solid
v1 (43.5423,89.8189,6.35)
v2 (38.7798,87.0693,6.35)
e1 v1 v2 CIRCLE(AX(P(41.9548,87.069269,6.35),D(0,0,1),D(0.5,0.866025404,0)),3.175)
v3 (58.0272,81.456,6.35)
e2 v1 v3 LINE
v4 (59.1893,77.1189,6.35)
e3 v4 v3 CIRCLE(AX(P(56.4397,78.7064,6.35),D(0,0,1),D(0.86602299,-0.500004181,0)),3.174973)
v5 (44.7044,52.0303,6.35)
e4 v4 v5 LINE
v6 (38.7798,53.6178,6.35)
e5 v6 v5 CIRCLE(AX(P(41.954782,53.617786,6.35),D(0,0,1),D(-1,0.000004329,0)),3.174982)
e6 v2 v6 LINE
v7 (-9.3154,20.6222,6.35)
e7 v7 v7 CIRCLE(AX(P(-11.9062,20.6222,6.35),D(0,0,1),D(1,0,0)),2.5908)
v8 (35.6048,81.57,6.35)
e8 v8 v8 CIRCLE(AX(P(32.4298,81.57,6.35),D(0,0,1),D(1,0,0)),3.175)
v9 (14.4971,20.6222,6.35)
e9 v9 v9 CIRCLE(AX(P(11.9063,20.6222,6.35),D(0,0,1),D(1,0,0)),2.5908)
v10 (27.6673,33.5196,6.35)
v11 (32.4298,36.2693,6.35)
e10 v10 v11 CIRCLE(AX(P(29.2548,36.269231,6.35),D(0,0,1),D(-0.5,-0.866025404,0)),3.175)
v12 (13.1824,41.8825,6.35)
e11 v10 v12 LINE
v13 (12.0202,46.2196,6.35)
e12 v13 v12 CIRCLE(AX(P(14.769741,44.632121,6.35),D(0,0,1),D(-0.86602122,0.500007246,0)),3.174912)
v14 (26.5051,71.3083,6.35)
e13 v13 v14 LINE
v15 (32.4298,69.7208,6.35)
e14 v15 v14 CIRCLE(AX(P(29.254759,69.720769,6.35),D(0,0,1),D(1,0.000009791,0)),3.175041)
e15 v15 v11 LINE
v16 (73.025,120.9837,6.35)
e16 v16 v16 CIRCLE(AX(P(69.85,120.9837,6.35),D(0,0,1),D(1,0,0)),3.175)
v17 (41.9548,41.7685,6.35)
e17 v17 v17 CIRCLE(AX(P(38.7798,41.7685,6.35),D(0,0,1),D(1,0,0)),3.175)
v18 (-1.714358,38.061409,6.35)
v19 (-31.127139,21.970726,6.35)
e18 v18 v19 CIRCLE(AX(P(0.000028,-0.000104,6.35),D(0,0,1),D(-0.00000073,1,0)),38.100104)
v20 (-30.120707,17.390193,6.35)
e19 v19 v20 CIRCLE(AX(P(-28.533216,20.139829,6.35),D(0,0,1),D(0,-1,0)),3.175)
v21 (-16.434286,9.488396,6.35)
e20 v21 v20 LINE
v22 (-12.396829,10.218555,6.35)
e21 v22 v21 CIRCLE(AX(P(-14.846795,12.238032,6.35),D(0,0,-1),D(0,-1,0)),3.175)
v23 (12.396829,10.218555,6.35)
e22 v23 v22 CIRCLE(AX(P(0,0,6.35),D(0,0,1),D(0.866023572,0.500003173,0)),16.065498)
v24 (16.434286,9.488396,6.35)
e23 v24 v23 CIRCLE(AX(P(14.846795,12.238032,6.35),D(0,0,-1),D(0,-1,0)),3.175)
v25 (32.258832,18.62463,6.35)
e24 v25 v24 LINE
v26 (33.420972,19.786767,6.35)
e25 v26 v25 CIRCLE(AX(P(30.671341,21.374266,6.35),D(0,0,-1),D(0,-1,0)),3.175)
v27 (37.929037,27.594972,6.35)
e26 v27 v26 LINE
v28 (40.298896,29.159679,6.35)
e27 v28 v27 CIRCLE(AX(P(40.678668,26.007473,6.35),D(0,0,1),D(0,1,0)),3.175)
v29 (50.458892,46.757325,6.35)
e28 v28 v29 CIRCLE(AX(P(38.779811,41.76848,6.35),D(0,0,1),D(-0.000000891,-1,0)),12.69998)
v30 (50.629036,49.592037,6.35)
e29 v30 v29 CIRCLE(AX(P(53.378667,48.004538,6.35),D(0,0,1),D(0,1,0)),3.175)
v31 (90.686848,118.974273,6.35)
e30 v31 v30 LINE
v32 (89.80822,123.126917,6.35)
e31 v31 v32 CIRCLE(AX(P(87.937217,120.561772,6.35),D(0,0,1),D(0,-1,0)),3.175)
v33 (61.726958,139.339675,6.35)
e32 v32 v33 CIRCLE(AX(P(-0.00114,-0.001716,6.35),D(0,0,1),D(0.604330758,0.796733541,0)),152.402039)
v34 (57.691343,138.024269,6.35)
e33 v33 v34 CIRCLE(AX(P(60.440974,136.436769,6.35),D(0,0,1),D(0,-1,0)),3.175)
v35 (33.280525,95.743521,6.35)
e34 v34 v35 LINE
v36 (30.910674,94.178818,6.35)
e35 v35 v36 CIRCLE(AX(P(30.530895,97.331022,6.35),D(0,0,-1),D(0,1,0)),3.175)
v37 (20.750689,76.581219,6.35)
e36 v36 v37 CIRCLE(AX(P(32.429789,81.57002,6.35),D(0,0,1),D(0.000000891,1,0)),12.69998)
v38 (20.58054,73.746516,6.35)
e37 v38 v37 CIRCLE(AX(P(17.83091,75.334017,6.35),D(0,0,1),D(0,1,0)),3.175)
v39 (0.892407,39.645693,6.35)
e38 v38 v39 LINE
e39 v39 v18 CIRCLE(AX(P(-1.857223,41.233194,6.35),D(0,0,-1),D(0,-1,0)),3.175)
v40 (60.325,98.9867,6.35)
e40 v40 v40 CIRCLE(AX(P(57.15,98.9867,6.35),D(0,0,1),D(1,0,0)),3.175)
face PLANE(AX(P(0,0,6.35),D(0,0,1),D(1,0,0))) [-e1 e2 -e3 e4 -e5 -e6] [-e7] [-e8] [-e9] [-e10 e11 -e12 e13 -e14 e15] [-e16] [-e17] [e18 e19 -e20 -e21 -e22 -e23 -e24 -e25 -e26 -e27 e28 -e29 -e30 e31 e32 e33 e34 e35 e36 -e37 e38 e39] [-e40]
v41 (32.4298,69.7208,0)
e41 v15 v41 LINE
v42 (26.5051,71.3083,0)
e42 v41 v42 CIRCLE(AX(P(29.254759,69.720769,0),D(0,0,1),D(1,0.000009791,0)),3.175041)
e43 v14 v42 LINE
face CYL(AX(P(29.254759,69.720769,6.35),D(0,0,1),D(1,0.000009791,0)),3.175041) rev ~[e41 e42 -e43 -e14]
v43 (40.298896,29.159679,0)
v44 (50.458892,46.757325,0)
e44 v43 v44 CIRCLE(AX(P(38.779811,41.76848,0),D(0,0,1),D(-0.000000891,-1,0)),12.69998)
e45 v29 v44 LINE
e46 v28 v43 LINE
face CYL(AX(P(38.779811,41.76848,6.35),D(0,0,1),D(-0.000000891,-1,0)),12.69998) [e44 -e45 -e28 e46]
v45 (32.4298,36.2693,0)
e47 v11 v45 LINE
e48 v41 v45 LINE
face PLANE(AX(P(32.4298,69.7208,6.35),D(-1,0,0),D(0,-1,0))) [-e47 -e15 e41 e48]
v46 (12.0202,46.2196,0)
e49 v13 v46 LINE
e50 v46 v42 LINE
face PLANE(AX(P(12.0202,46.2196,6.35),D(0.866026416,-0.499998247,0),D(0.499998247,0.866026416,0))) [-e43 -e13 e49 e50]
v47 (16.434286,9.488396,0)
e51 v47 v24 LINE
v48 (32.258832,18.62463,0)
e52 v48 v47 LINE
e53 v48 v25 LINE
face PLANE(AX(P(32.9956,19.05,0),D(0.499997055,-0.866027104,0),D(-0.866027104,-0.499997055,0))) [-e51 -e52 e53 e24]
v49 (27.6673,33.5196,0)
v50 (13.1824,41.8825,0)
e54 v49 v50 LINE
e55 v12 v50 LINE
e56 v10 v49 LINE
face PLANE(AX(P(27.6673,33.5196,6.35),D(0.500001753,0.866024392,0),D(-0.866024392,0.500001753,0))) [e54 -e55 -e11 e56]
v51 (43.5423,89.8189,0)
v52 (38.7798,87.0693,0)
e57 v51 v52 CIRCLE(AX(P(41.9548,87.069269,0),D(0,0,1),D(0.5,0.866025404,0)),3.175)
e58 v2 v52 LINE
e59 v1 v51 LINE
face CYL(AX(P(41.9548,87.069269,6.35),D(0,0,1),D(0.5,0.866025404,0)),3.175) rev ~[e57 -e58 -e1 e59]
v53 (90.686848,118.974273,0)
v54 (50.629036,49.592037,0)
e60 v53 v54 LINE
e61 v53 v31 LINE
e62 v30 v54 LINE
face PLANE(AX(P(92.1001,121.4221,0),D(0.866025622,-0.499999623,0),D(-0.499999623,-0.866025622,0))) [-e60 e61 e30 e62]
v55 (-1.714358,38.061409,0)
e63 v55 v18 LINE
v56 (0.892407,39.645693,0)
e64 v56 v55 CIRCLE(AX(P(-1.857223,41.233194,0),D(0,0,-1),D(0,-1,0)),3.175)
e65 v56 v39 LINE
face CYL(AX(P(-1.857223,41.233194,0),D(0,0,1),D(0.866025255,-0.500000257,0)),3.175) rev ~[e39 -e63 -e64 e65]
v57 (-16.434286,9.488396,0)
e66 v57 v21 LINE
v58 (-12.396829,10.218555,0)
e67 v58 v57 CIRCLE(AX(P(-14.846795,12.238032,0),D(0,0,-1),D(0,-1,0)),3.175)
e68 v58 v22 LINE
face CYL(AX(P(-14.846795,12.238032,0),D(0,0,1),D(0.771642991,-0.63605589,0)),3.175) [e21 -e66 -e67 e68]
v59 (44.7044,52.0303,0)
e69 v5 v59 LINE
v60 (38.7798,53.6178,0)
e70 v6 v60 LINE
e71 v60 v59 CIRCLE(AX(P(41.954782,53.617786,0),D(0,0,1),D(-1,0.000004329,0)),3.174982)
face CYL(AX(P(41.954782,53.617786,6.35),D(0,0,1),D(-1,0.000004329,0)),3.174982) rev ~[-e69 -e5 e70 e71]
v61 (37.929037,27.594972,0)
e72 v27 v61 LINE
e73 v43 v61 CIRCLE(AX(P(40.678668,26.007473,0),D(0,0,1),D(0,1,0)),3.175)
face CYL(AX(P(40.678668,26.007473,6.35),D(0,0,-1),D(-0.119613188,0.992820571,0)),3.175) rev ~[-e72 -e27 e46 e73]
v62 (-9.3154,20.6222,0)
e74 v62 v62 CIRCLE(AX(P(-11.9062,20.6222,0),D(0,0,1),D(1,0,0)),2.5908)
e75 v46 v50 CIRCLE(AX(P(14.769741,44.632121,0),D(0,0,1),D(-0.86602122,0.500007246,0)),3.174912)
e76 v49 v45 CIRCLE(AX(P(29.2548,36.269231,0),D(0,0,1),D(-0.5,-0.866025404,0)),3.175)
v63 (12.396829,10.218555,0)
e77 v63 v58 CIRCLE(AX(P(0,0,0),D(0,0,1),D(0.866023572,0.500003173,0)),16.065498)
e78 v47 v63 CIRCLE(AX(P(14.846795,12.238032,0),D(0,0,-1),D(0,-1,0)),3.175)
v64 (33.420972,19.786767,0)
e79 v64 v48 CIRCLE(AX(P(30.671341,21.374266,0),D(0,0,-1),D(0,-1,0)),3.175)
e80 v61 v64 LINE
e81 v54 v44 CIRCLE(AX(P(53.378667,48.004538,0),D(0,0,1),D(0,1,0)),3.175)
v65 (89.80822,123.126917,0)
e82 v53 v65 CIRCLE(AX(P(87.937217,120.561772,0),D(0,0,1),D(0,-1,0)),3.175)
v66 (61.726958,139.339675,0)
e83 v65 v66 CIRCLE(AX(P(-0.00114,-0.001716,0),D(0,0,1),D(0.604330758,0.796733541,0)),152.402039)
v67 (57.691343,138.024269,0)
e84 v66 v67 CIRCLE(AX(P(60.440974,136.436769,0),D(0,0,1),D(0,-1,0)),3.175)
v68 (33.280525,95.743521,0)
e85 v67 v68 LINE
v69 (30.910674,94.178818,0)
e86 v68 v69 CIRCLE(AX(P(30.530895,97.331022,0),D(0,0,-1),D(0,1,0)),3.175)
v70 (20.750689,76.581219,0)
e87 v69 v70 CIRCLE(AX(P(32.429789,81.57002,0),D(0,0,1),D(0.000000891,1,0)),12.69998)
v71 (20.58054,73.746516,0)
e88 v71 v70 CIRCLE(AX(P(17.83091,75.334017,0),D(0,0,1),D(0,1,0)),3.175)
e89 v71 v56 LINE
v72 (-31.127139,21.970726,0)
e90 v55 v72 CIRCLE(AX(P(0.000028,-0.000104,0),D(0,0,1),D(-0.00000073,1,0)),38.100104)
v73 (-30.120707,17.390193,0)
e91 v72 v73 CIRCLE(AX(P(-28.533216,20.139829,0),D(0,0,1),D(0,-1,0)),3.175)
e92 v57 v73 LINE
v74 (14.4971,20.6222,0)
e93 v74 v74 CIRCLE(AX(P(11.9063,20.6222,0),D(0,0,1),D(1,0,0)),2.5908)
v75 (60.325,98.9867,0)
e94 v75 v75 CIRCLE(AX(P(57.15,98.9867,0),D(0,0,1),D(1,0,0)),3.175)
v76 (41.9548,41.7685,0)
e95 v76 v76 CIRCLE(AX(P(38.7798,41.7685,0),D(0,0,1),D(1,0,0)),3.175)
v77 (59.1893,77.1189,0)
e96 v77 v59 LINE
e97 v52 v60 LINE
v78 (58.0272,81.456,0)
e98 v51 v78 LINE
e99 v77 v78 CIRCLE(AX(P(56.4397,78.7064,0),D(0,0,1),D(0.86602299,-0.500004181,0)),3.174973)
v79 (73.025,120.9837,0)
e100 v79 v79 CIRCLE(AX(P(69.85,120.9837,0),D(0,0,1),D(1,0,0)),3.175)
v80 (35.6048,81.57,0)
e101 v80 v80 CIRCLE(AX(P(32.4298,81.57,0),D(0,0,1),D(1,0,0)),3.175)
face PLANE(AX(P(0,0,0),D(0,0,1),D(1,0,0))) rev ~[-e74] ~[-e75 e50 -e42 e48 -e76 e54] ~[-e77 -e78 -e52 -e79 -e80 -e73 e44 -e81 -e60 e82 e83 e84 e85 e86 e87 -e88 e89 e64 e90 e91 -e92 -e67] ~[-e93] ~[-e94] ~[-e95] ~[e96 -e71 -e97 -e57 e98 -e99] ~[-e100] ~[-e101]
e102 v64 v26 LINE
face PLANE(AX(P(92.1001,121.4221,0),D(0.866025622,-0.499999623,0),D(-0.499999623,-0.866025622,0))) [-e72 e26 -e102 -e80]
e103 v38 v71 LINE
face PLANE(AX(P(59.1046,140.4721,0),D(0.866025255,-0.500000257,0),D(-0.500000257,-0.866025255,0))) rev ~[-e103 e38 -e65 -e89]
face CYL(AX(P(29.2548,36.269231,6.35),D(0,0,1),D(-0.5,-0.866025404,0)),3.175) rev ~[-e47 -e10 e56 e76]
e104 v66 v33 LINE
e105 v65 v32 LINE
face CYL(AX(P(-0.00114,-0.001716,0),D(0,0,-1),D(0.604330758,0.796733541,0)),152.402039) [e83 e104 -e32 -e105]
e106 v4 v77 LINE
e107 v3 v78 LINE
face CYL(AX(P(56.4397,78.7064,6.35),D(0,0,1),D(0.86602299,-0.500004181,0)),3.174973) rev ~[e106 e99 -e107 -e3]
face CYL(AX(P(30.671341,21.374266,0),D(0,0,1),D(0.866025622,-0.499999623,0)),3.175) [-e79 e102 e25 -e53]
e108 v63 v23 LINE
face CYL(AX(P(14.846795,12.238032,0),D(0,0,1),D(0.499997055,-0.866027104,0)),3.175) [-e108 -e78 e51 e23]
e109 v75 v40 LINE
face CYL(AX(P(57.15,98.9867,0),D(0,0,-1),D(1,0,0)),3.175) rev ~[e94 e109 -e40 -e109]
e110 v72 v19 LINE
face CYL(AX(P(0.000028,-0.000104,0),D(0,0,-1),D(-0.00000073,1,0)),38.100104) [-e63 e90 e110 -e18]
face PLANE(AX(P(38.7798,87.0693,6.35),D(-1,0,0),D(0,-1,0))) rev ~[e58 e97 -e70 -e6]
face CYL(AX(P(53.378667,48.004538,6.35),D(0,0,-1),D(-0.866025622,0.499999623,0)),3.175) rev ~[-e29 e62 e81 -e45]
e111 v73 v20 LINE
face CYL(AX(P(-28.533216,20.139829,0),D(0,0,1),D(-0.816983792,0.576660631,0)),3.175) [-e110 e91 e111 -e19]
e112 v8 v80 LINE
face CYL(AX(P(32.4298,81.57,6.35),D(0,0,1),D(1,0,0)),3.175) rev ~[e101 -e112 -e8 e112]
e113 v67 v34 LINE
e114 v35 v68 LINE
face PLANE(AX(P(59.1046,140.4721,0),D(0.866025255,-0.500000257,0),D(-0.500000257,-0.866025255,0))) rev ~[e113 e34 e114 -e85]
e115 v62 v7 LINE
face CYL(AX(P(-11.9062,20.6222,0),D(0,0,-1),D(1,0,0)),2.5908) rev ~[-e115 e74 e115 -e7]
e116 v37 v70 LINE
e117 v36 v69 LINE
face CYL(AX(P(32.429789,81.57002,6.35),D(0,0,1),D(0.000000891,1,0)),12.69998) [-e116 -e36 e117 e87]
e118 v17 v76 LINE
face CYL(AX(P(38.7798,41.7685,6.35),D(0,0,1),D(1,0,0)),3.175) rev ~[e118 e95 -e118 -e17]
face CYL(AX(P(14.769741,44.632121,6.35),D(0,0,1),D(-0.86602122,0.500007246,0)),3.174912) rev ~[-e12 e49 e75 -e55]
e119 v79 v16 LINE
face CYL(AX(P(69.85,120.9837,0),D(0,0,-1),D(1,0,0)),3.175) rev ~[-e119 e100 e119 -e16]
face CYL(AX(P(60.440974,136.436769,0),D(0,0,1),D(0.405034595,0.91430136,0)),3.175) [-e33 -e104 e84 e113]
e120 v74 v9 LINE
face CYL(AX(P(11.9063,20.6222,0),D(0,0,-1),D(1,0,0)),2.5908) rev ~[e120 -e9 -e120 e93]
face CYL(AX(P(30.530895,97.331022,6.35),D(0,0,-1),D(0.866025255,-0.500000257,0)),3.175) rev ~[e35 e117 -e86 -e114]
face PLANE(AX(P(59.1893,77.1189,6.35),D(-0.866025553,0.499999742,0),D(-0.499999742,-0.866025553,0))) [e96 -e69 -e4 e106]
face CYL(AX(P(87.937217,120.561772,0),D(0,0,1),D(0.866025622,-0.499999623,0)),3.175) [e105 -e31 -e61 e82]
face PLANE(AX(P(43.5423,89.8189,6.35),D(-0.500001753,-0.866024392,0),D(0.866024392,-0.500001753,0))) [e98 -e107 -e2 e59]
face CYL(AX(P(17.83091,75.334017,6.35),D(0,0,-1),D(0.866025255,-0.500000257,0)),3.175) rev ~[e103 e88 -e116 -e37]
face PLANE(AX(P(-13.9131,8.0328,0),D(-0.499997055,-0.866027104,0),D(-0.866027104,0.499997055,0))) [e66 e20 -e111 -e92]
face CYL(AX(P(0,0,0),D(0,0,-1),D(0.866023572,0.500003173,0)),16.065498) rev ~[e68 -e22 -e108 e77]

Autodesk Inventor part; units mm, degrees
ref_plane "YZ Plane" through (0, 0, 0) normal (1, 0, 0) x (0, 1, 0)
ref_plane "XZ Plane" through (0, 0, 0) normal (0, 1, 0) x (-1, 0, 0)
ref_plane "XY Plane" through (0, 0, 0) normal (0, 0, 1) x (1, 0, 0)
sketch "Sketch1" plane through (0, 0, 0) normal (0, 0, 1) x (1, 0, 0)
  circle A0 centre (11.9062, -20.6222) radius 2.5908 construction
  circle A1 centre (-23.8125, 0) radius 2.5908 construction
  circle A2 centre (11.9063, 20.6222) radius 2.5908 projected
  circle A3 centre (23.8125, 0) radius 2.5908 construction
  circle A4 centre (-11.9062, 20.6222) radius 2.5908 projected
  circle A5 centre (-11.9062, -20.6222) radius 2.5908 construction
  circle A6 centre (0, 0) radius 14.478 construction
  circle A7 centre (57.15, 98.9867) radius 3.175 projected
  circle A8 centre (69.85, 120.9837) radius 3.175 projected
  circle A9 centre (98.9867, 57.15) radius 3.175 construction
  circle A10 centre (120.9837, 69.85) radius 3.175 construction
  circle A11 centre (114.3, 0) radius 3.175 construction
  circle A12 centre (139.7, 0) radius 3.175 construction
  circle A13 centre (98.9867, -57.15) radius 3.175 construction
  circle A14 centre (120.9837, -69.85) radius 3.175 construction
  circle A15 centre (57.15, -98.9867) radius 3.175 construction
  circle A16 centre (69.85, -120.9837) radius 3.175 construction
  circle A17 centre (0, -114.3) radius 3.175 construction
  circle A18 centre (0, -139.7) radius 3.175 construction
  circle A19 centre (-57.15, -98.9867) radius 3.175 construction
  circle A20 centre (-69.85, -120.9837) radius 3.175 construction
  circle A21 centre (-98.9867, -57.15) radius 3.175 construction
  circle A22 centre (-120.9837, -69.85) radius 3.175 construction
  circle A23 centre (-114.3, 0) radius 3.175 construction
  circle A24 centre (-139.7, 0) radius 3.175 construction
  circle A25 centre (-98.9867, 57.15) radius 3.175 construction
  circle A26 centre (-120.9837, 69.85) radius 3.175 construction
  circle A27 centre (-57.15, 98.9867) radius 3.175 construction
  circle A28 centre (-69.85, 120.9837) radius 3.175 construction
  circle A29 centre (0, 114.3) radius 3.175 construction
  circle A30 centre (0, 139.7) radius 3.175 construction
  circle A31 centre (0, 0) radius 152.4 construction
  arc A32 (92.1001, 121.4221) -> (59.1046, 140.4721) centre (0, 0) ccw
  line L0 (59.1046, 140.4721) -> (0, 38.1)
  line L1 (92.1001, 121.4221) -> (32.9956, 19.05)
  line L2 (69.85, 120.9837) -> (0, 0) construction
  line L3 (0, 0) -> (-12.5383, 7.239) construction
  line L4 (0, -263.7526) -> (0, 221.7588) construction
  arc A33 (0, 38.1) -> (-32.9956, 19.05) centre (0, 0) ccw
  line L5 (12.5383, 7.239) -> (0, 0) construction
  arc A34 (13.9131, 8.0328) -> (-13.9131, 8.0328) centre (0, 0) ccw
  line L6 (-13.9131, 8.0328) -> (-32.9956, 19.05)
  line L7 (32.9956, 19.05) -> (13.9131, 8.0328)
  dimension "d1" = 38.1
  dimension "d19" = 1.5875
extrude "Extrusion1" add sketch "Sketch1" along normal blind 6.35
sketch "Sketch2" plane through (0, 0, 6.35) normal (0, 0, 1) x (1, 0, 0)
  line L0 (12.0202, 46.2196) -> (26.5051, 71.3083)
  line L1 (32.4298, 69.7208) -> (32.4298, 36.2693)
  line L2 (27.6673, 33.5196) -> (13.1824, 41.8825)
  line L3 (59.1046, 140.4721) -> (0, 38.1) construction
  arc A0 (0, 38.1) -> (-32.9956, 19.05) centre (0, 0) ccw construction
  line L4 (38.7798, 87.0693) -> (38.7798, 53.6178)
  line L5 (43.5423, 89.8189) -> (58.0272, 81.456)
  line L6 (59.1893, 77.1189) -> (44.7044, 52.0303)
  line L7 (32.9956, 19.05) -> (92.1001, 121.4221) construction
  circle A1 centre (11.9063, 20.6222) radius 2.5908 construction
  arc A2 (12.0202, 46.2196) -> (13.1824, 41.8825) centre (14.7699, 44.6321) ccw
  arc A3 (32.4298, 69.7208) -> (26.5051, 71.3083) centre (29.2548, 69.7208) ccw
  arc A4 (27.6673, 33.5196) -> (32.4298, 36.2693) centre (29.2548, 36.2693) ccw
  arc A5 (38.7798, 53.6178) -> (44.7044, 52.0303) centre (41.9548, 53.6178) ccw
  arc A6 (43.5423, 89.8189) -> (38.7798, 87.0693) centre (41.9548, 87.0693) ccw
  arc A7 (59.1893, 77.1189) -> (58.0272, 81.456) centre (56.4397, 78.7064) ccw
  point P0 (0, 0)
  point P1 (32.4298, 30.77)
  point P2 (38.7798, 92.5685)
  dimension "d4" = 6.35
  dimension "d5" = 6.35
  dimension "d6" = 6.35
  dimension "d7" = 19.05
  dimension "d8" = 3.175
extrude "Extrusion2" cut sketch "Sketch2" against normal blind 6.35
sketch "Sketch3" plane through (0, 0, 6.35) normal (0, 0, 1) x (1, 0, 0)
  circle A0 centre (32.4298, 81.57) radius 3.175
  line L0 (12.0202, 46.2196) -> (26.5051, 71.3083) construction
  circle A1 centre (38.7798, 41.7685) radius 3.175
  line L1 (59.1893, 77.1189) -> (44.7044, 52.0303) construction
  line L2 (32.4298, 69.7208) -> (32.4298, 36.2693) construction
  line L3 (38.7798, 53.6178) -> (38.7798, 87.0693) construction
  point P0 (0, 0)
  dimension "d12" = 6.35
extrude "Extrusion3" cut sketch "Sketch3" against normal through all
sketch "Sketch4" plane through (0, 0, 6.35) normal (0, 0, 1) x (1, 0, 0)
  arc A0 (32.4298, 94.27) -> (21.4313, 75.22) centre (32.4298, 81.57) ccw
  circle A1 centre (32.4298, 81.57) radius 3.175 construction
  line L0 (32.4298, 94.27) -> (21.4313, 75.22)
  line L1 (59.1046, 140.4721) -> (0, 38.1) construction
  arc A2 (38.7798, 29.0685) -> (49.7783, 48.1185) centre (38.7798, 41.7685) ccw
  line L2 (49.7783, 48.1185) -> (38.7798, 29.0685)
  circle A3 centre (38.7798, 41.7685) radius 3.175 construction
  line L3 (32.9956, 19.05) -> (92.1001, 121.4221) construction
  point P0 (0, 0)
  point P1 (57.6913, 138.0243)
  point P2 (0.8924, 39.6457)
  point P3 (33.4209, 19.7868)
  point P4 (90.6869, 118.9743)
  dimension "d15" = 12.7
extrude "Extrusion4" add sketch "Sketch4" against normal blind 6.35
fillet "Fillet2" radius 3.175 11 edges at (-32.9956, 19.05, 3.175) (0, 38.1, 3.175) (32.4298, 94.27, 3.175) (21.4313, 75.22, 3.175) (59.1046, 140.4721, 3.175) (92.1001, 121.4221, 3.175) (49.7783, 48.1185, 3.175) (38.7798, 29.0685, 3.175) (32.9956, 19.05, 3.175) (-13.9131, 8.0328, 3.175) (13.9131, 8.0328, 3.175)
equation "\"d5\" = d4"
equation "\"d6\" = d4"
properties part number "Doubler" material "Aluminum 6061"
